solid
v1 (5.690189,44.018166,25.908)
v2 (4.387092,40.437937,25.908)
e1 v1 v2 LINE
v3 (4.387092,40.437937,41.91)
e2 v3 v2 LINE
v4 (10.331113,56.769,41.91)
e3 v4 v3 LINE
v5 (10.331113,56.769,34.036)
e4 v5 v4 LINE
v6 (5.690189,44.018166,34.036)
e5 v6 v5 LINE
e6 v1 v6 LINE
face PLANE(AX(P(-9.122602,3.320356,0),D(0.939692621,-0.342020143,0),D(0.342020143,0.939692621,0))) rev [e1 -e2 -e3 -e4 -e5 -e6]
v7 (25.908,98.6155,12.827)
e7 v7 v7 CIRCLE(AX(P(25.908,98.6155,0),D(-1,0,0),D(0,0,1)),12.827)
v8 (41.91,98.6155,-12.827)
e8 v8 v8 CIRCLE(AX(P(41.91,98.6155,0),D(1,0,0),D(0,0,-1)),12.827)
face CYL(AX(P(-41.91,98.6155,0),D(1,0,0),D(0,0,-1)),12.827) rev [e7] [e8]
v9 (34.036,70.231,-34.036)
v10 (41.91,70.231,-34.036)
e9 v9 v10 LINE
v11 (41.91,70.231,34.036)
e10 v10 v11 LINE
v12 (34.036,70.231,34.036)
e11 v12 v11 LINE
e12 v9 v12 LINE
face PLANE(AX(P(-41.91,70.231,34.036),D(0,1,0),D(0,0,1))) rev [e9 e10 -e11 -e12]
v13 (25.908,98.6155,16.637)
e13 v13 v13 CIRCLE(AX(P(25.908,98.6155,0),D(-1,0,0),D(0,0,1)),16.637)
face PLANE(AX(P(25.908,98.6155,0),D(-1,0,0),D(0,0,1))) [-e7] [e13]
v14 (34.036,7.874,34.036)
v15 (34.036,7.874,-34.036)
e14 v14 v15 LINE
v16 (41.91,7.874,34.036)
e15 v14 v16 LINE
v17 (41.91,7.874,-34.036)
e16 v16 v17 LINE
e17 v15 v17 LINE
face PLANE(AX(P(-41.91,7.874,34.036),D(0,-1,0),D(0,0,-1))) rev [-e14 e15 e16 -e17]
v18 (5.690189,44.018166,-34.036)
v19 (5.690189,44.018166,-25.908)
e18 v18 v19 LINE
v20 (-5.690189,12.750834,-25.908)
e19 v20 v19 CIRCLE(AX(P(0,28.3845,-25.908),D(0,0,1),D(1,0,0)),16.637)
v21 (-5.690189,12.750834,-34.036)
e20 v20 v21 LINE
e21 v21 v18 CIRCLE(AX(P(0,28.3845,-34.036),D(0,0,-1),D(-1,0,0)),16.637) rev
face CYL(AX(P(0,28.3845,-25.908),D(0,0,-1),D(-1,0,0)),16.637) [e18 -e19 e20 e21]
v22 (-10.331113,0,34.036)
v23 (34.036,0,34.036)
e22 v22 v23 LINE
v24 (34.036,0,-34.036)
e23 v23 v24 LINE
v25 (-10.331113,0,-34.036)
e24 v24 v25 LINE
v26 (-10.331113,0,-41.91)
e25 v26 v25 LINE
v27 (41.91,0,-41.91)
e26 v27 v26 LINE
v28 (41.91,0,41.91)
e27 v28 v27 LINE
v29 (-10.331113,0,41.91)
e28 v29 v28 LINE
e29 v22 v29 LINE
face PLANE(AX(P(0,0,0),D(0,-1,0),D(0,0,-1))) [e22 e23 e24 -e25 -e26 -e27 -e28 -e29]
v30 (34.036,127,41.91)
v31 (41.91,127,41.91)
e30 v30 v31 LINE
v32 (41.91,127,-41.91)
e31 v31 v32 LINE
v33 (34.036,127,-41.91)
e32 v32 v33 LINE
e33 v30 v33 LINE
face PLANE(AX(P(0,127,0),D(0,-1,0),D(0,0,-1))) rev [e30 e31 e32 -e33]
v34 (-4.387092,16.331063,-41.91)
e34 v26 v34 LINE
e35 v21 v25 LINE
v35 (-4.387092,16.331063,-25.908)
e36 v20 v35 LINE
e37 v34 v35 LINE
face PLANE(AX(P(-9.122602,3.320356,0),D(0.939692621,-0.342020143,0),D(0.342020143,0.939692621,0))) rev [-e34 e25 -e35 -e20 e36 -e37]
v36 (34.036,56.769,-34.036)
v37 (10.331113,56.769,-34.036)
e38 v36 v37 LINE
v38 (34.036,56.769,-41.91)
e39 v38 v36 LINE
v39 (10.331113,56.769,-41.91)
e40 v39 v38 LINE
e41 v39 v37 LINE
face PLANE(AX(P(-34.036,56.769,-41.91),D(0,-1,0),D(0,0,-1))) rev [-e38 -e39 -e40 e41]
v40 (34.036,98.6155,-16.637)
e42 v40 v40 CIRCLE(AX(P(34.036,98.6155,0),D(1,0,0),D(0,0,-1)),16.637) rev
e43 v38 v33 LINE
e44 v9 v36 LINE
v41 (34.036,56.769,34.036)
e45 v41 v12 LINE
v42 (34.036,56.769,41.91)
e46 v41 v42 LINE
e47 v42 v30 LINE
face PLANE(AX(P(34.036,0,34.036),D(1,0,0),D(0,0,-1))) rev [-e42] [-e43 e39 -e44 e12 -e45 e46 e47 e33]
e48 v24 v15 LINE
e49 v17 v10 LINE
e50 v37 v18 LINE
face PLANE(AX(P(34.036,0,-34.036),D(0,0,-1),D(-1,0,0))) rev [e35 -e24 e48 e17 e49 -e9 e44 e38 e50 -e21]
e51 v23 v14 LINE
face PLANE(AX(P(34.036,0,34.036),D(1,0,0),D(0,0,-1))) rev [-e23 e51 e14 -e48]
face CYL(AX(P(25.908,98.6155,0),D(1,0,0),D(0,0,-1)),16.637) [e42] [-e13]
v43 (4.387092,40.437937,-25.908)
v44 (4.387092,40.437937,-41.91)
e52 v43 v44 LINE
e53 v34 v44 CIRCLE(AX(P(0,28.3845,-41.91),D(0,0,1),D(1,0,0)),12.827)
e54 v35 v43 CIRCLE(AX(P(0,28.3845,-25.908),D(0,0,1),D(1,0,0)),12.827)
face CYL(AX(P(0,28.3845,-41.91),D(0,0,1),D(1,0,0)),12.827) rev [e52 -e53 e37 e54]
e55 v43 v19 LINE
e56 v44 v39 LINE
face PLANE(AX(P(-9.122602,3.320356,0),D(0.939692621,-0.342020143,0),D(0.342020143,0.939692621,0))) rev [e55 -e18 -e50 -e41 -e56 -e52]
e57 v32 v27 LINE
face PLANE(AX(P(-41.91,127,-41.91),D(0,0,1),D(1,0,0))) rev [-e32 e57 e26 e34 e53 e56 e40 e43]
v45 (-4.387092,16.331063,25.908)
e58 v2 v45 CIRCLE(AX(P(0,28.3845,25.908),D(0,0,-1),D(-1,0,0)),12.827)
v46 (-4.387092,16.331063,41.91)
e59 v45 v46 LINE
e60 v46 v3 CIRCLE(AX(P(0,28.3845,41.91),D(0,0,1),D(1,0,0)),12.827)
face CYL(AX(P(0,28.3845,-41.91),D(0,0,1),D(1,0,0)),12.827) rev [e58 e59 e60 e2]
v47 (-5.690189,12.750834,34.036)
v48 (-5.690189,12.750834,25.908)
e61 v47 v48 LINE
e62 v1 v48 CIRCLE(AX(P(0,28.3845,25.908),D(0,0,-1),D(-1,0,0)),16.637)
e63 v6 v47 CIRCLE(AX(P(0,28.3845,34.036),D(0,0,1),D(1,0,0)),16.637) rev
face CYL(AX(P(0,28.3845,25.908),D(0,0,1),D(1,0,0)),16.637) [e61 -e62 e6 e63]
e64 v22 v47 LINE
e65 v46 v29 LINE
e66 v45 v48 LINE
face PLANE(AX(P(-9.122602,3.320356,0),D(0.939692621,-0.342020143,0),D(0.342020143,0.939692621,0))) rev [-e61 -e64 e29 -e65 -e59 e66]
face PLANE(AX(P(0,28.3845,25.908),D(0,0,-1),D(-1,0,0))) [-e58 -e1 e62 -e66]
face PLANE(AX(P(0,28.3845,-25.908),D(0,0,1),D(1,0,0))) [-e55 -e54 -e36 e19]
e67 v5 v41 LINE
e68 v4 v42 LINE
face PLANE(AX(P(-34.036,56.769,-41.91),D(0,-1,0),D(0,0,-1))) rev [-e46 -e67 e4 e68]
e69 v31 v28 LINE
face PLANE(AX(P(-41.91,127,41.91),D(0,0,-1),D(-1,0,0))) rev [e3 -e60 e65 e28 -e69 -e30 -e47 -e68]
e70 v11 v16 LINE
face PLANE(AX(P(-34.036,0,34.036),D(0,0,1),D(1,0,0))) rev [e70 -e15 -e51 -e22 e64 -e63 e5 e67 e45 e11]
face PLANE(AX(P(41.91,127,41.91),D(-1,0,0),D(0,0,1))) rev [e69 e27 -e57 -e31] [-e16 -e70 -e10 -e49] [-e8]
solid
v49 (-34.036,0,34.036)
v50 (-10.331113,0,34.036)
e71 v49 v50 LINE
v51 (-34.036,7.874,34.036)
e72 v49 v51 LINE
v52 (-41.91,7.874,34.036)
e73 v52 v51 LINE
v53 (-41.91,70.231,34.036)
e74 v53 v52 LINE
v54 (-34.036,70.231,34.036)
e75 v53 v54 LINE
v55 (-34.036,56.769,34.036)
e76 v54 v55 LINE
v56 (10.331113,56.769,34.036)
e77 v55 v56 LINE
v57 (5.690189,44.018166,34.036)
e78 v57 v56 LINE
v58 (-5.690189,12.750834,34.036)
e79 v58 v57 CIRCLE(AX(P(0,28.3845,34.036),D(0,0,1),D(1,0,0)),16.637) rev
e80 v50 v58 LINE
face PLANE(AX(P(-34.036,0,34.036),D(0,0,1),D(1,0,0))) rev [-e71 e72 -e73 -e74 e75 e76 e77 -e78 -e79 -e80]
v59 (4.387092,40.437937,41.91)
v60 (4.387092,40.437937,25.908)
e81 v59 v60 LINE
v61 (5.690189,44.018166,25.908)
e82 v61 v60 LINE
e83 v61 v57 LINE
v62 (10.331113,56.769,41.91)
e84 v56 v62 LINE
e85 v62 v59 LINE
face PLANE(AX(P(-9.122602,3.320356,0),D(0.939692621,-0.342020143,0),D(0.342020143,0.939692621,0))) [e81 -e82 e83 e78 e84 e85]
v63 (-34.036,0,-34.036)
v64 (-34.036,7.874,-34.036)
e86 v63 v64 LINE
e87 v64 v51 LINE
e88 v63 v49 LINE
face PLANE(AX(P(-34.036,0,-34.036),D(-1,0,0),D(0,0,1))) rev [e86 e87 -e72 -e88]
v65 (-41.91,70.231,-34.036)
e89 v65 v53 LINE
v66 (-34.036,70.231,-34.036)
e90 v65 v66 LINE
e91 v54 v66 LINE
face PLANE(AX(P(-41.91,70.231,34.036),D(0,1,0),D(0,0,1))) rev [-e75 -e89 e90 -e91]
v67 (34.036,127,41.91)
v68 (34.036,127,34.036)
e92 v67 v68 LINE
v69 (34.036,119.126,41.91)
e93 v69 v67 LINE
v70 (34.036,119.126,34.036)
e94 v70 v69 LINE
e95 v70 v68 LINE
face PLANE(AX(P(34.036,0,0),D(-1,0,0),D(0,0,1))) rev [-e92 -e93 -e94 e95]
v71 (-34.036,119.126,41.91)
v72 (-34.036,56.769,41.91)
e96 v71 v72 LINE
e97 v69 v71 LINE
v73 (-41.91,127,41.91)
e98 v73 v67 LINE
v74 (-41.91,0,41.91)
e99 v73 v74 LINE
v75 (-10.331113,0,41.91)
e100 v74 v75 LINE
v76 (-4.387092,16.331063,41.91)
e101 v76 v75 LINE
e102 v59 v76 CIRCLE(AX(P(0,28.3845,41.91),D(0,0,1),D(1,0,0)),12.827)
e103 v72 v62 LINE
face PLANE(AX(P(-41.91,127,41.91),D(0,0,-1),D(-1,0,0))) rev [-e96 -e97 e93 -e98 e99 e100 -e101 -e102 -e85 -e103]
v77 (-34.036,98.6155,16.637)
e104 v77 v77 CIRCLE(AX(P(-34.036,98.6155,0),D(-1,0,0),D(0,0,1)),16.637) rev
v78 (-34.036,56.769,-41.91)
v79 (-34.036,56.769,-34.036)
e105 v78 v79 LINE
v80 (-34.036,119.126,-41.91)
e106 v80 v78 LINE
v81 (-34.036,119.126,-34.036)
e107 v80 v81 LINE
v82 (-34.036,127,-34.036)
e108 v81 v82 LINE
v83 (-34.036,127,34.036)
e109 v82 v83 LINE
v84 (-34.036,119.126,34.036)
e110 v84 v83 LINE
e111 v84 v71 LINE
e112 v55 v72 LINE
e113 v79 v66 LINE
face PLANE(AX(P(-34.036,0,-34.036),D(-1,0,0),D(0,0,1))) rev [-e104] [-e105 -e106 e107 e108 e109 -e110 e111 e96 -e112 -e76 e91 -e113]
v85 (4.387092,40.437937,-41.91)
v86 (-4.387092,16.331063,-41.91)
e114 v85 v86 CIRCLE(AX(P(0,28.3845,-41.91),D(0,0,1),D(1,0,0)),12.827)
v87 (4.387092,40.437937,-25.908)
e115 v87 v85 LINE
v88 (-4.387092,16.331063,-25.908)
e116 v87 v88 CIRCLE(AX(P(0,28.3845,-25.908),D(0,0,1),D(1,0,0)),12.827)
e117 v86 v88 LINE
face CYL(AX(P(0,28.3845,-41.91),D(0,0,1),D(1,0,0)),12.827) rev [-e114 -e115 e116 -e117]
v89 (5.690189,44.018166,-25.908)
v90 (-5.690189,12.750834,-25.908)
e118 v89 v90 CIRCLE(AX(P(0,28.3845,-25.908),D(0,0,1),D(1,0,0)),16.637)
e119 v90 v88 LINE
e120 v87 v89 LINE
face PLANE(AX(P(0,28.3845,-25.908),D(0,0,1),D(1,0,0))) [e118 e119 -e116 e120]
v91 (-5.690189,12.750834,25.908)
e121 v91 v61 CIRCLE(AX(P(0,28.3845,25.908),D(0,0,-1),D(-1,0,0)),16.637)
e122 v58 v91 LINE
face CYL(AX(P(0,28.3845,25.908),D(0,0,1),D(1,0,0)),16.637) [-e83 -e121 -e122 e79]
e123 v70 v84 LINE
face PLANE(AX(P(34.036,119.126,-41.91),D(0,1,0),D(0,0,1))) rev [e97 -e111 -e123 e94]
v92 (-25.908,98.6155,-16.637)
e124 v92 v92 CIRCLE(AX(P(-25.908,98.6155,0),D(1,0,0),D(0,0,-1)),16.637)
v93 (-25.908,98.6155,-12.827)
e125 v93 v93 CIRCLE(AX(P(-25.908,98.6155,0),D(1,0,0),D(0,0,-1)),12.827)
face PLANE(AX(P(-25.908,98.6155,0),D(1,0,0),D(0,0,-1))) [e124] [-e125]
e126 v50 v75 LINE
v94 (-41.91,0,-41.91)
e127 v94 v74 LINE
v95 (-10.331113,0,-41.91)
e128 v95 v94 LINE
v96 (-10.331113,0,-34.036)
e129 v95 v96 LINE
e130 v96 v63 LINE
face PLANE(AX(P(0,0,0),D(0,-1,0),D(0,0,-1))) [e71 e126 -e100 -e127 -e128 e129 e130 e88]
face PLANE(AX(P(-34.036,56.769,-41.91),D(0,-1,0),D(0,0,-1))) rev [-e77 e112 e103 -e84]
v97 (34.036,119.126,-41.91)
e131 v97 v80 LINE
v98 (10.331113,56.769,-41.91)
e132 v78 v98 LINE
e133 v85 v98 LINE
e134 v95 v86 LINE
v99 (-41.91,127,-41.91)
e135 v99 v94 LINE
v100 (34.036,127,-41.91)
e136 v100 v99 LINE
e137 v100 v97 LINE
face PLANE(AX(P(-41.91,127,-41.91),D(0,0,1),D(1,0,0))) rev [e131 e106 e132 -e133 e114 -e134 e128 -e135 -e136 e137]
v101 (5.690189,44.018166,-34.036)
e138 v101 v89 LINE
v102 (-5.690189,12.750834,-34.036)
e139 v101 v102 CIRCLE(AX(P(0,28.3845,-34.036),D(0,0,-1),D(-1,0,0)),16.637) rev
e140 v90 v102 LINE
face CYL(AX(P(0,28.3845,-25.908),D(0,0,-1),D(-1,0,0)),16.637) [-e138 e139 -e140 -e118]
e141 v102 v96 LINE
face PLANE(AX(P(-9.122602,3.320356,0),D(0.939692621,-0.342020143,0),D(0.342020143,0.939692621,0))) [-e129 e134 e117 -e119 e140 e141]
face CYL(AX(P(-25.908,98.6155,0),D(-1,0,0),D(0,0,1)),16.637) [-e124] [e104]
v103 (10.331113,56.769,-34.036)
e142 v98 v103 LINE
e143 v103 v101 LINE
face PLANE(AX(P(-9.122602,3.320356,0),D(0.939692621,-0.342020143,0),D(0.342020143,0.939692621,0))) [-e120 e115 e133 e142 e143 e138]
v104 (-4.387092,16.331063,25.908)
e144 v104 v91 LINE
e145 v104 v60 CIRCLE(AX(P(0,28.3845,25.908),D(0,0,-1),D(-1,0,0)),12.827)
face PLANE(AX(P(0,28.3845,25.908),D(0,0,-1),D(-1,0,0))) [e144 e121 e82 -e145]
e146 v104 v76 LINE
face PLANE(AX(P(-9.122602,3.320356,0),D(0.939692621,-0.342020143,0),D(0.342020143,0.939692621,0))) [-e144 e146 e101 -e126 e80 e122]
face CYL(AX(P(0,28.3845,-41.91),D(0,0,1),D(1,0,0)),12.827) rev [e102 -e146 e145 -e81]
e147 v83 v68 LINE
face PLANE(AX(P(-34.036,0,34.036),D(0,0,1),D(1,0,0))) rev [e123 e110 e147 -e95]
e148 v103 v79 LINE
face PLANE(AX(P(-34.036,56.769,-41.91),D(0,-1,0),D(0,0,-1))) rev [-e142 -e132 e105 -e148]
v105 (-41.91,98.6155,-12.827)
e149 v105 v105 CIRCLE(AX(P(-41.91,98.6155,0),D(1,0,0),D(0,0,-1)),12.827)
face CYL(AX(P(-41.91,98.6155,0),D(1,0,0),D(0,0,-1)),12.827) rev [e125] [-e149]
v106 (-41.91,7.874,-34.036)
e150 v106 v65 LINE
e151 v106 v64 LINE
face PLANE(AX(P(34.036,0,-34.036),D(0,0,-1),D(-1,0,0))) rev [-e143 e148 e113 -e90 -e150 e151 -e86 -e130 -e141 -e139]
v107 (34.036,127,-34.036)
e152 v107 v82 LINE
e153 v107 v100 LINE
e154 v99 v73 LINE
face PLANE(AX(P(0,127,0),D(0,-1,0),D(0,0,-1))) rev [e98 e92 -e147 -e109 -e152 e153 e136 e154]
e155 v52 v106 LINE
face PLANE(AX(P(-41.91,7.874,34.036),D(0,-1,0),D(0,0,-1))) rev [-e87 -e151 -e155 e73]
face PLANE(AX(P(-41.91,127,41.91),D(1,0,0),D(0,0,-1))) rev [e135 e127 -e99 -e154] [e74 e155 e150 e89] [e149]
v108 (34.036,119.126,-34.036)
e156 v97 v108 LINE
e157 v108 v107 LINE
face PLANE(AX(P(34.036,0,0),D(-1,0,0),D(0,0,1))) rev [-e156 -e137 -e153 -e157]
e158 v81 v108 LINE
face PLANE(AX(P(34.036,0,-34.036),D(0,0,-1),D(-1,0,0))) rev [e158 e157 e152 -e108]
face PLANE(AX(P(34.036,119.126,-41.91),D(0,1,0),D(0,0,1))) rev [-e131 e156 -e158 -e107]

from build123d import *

# Parameters (mm, degrees)
SKETCH2_W                = 83.82
SKETCH2_H                = 83.82
BOSS_EXTRUDE1_DEPTH      = 127
SKETCH3_R                = 12.827
CUT_EXTRUDE1_DEPTH       = 158.832951249
SKETCH4_R                = 12.827
CUT_EXTRUDE2_DEPTH       = 158.832951249
SKETCH5_W                = 68.072
SKETCH5_H                = 68.072
CUT_EXTRUDE3_DEPTH       = 141.149549411
SKETCH6_W                = 68.072
SKETCH6_H                = 62.357
CUT_EXTRUDE4_DEPTH       = 158.832951249
SKETCH7_W                = 68.072
SKETCH7_H                = 62.357
CUT_EXTRUDE5_DEPTH       = 158.832951249
BOSS_EXTRUDE6_START      = 8.128
SKETCH18_R               = 16.637
SKETCH18_R_2             = 12.827
BOSS_EXTRUDE6_DEPTH      = 8.128
SKETCH19_R               = 16.637
SKETCH19_R_2             = 12.827
BOSS_EXTRUDE7_DEPTH      = 8.128
SKETCH20_R               = 16.637
SKETCH20_R_2             = 12.827
BOSS_EXTRUDE8_DEPTH      = 8.128
BOSS_EXTRUDE9_START      = 8.128
SKETCH21_R               = 16.637
SKETCH21_R_2             = 12.827
BOSS_EXTRUDE9_DEPTH      = 8.128
INTERSECT1_START         = -41.91
INTERSECT1_DEPTH         = 83.82
INTERSECT1_START_2       = -25.908
INTERSECT1_2_OUTLINE_W   = 8.128
INTERSECT1_2_OUTLINE_H   = 56.769
INTERSECT1_2_DEPTH       = 51.816
INTERSECT1_3_OUTLINE_W   = 7.874
INTERSECT1_3_OUTLINE_H   = 56.769
INTERSECT1_3_OUTLINE_H_2 = 7.874
INTERSECT1_3_DEPTH       = 83.82
INTERSECT1_4_DEPTH       = 7.874
INTERSECT1_START_3       = 34.036
INTERSECT1_5_DEPTH       = 7.874
INTERSECT1_START_4       = -34.036
INTERSECT1_6_DEPTH       = 8.128
INTERSECT1_START_5       = 25.908
INTERSECT1_7_DEPTH       = 8.128
INTERSECT1_8_OUTLINE_R   = 12.827
INTERSECT1_8_DEPTH       = 7.874
INTERSECT1_9_OUTLINE_R   = 16.637
INTERSECT1_9_OUTLINE_R_2 = 12.827
INTERSECT1_9_DEPTH       = 8.128


with BuildPart() as part:
    # Sketch2 → Boss-Extrude1 (new body)
    with BuildSketch(Plane(origin=(0, 0, 0), x_dir=(1, 0, 0), z_dir=(0, 1, 0))):
        Rectangle(SKETCH2_W, SKETCH2_H)
    extrude(amount=BOSS_EXTRUDE1_DEPTH)

    # Sketch3 → Cut-Extrude1 (cut, through all)
    with BuildSketch(Plane.XY.offset(41.91)):
        with Locations((0, 28.3845)):
            Circle(SKETCH3_R)
    extrude(amount=-CUT_EXTRUDE1_DEPTH, mode=Mode.SUBTRACT)

    # Sketch4 → Cut-Extrude2 (cut, through all)
    with BuildSketch(Plane(origin=(41.91, 0, 0), x_dir=(0, 0, -1), z_dir=(1, 0, 0))):
        with Locations((0, 98.6155)):
            Circle(SKETCH4_R)
    extrude(amount=-CUT_EXTRUDE2_DEPTH, mode=Mode.SUBTRACT)

    # Sketch5 → Cut-Extrude3 (cut, through all)
    with BuildSketch(Plane(origin=(0, 127, 0), x_dir=(1, 0, 0), z_dir=(0, 1, 0))):
        Rectangle(SKETCH5_W, SKETCH5_H)
    extrude(amount=-CUT_EXTRUDE3_DEPTH, mode=Mode.SUBTRACT)

    # Sketch6 → Cut-Extrude4 (cut, through all)
    with BuildSketch(Plane(origin=(41.91, 0, 0), x_dir=(0, 0, -1), z_dir=(1, 0, 0))):
        with Locations((0, 39.0525)):
            Rectangle(SKETCH6_W, SKETCH6_H)
    extrude(amount=-CUT_EXTRUDE4_DEPTH, mode=Mode.SUBTRACT)

    # Sketch7 → Cut-Extrude5 (cut, through all)
    with BuildSketch(Plane.XY.offset(41.91)):
        with Locations((0, 87.9475)):
            Rectangle(SKETCH7_W, SKETCH7_H)
    extrude(amount=-CUT_EXTRUDE5_DEPTH, mode=Mode.SUBTRACT)

    # Sketch18 → Boss-Extrude6 (add)
    with BuildSketch(Plane(origin=(-34.036, 0, 0), x_dir=(0, 0, -1), z_dir=(1, 0, 0)).offset(BOSS_EXTRUDE6_START)):
        with Locations(Location((0, 98.6155, 0), (0, 0, 180))):
            Circle(SKETCH18_R)
        with Locations((0, 98.6155)):
            Circle(SKETCH18_R_2, mode=Mode.SUBTRACT)
    extrude(amount=-BOSS_EXTRUDE6_DEPTH)

    # Sketch19 → Boss-Extrude7 (add)
    with BuildSketch(Plane.ZY.offset(-34.036)):
        with Locations((0, 98.6155)):
            Circle(SKETCH19_R)
        with Locations(Location((0, 98.6155, 0), (0, 0, 180))):
            Circle(SKETCH19_R_2, mode=Mode.SUBTRACT)
    extrude(amount=BOSS_EXTRUDE7_DEPTH)

    # Sketch20 → Boss-Extrude8 (add)
    with BuildSketch(Plane(origin=(0, 0, 34.036), x_dir=(-1, 0, 0), z_dir=(0, 0, -1))):
        with Locations(Location((0, 28.3845, 0), (0, 0, 180))):
            Circle(SKETCH20_R)
        with Locations(Location((0, 28.3845, 0), (0, 0, 180))):
            Circle(SKETCH20_R_2, mode=Mode.SUBTRACT)
    extrude(amount=BOSS_EXTRUDE8_DEPTH)

    # Sketch21 → Boss-Extrude9 (add)
    with BuildSketch(Plane.XY.offset(-34.036).offset(BOSS_EXTRUDE9_START)):
        with Locations((0, 28.3845)):
            Circle(SKETCH21_R)
        with Locations((0, 28.3845)):
            Circle(SKETCH21_R_2, mode=Mode.SUBTRACT)
    extrude(amount=-BOSS_EXTRUDE9_DEPTH)

    # Intersect1: read off the stored shape, not the designer's step
    # Intersect1 outline → Intersect1 (cut)
    with BuildSketch(Plane.XY.offset(INTERSECT1_START)):
        with BuildLine():
            Line((41.91, 127), (34.036, 127))
            Line((34.036, 127), (34.036, 56.769))
            Line((34.036, 56.769), (10.331113115, 56.769))
            Line((10.331113115, 56.769), (4.387092378, 40.437937247))
            ThreePointArc((4.387092378, 40.437937247), (12.053437247, 23.997407622), (-4.387092378, 16.331062753))
            Line((-4.387092378, 16.331062753), (-10.331113115, 0))
            Line((-10.331113115, 0), (41.91, 0))
            Line((41.91, 0), (41.91, 127))
        make_face()
    extrude(amount=INTERSECT1_DEPTH, mode=Mode.SUBTRACT)

    # Intersect1 2 outline → Intersect1 2 (cut)
    with BuildSketch(Plane.XY.offset(INTERSECT1_START_2)):
        with Locations((29.972, 98.6155)):
            Rectangle(INTERSECT1_2_OUTLINE_W, INTERSECT1_2_OUTLINE_H)
    extrude(amount=INTERSECT1_2_DEPTH, mode=Mode.SUBTRACT)


with BuildPart() as body_2:
    # Intersect1 3 outline → Intersect1 3 (new body)
    with BuildSketch(Plane.XY.offset(INTERSECT1_START)):
        with Locations((37.973, 98.6155)):
            Rectangle(INTERSECT1_3_OUTLINE_W, INTERSECT1_3_OUTLINE_H)
        with Locations((37.973, 3.937)):
            Rectangle(INTERSECT1_3_OUTLINE_W, INTERSECT1_3_OUTLINE_H_2)
    extrude(amount=INTERSECT1_3_DEPTH)

    # Intersect1 4 outline → Intersect1 4 (add)
    with BuildSketch(Plane.XY.offset(INTERSECT1_START)):
        with BuildLine():
            ThreePointArc((4.387092378, 40.437937247), (12.053437247, 23.997407622), (-4.387092378, 16.331062753))
            Line((-4.387092378, 16.331062753), (-10.331113115, 0))
            Line((-10.331113115, 0), (34.036, 0))
            Line((34.036, 0), (34.036, 7.874))
            Line((34.036, 7.874), (41.91, 7.874))
            Line((41.91, 7.874), (41.91, 70.231))
            Line((41.91, 70.231), (34.036, 70.231))
            Line((34.036, 70.231), (34.036, 56.769))
            Line((34.036, 56.769), (10.331113115, 56.769))
            Line((10.331113115, 56.769), (4.387092378, 40.437937247))
        make_face()
    extrude(amount=INTERSECT1_4_DEPTH)

    # Intersect1 5 outline → Intersect1 5 (add)
    with BuildSketch(Plane.XY.offset(INTERSECT1_START_3)):
        with BuildLine():
            ThreePointArc((4.387092378, 40.437937247), (12.053437247, 23.997407622), (-4.387092378, 16.331062753))
            Line((-4.387092378, 16.331062753), (-10.331113115, 0))
            Line((-10.331113115, 0), (34.036, 0))
            Line((34.036, 0), (34.036, 7.874))
            Line((34.036, 7.874), (41.91, 7.874))
            Line((41.91, 7.874), (41.91, 70.231))
            Line((41.91, 70.231), (34.036, 70.231))
            Line((34.036, 70.231), (34.036, 56.769))
            Line((34.036, 56.769), (10.331113115, 56.769))
            Line((10.331113115, 56.769), (4.387092378, 40.437937247))
        make_face()
    extrude(amount=INTERSECT1_5_DEPTH)

    # Intersect1 6 outline → Intersect1 6 (add)
    with BuildSketch(Plane.XY.offset(INTERSECT1_START_4)):
        with BuildLine():
            Line((5.690189125, 44.018166132), (4.387092378, 40.437937247))
            ThreePointArc((4.387092378, 40.437937247), (12.053437247, 23.997407622), (-4.387092378, 16.331062753))
            Line((-4.387092378, 16.331062753), (-5.690189125, 12.750833868))
            ThreePointArc((-5.690189125, 12.750833868), (15.633666132, 22.694310875), (5.690189125, 44.018166132))
        make_face()
    extrude(amount=INTERSECT1_6_DEPTH)

    # Intersect1 7 outline → Intersect1 7 (add)
    with BuildSketch(Plane.XY.offset(INTERSECT1_START_5)):
        with BuildLine():
            Line((5.690189125, 44.018166132), (4.387092378, 40.437937247))
            ThreePointArc((4.387092378, 40.437937247), (12.053437247, 23.997407622), (-4.387092378, 16.331062753))
            Line((-4.387092378, 16.331062753), (-5.690189125, 12.750833868))
            ThreePointArc((-5.690189125, 12.750833868), (15.633666132, 22.694310875), (5.690189125, 44.018166132))
        make_face()
    extrude(amount=INTERSECT1_7_DEPTH)

    # Intersect1 8 outline → Intersect1 8 (cut)
    with BuildSketch(Plane.YZ.offset(INTERSECT1_START_3)):
        with Locations((98.6155, 0)):
            Circle(INTERSECT1_8_OUTLINE_R)
    extrude(amount=INTERSECT1_8_DEPTH, mode=Mode.SUBTRACT)

    # Intersect1 9 outline → Intersect1 9 (add)
    with BuildSketch(Plane.YZ.offset(INTERSECT1_START_5)):
        with Locations((98.6155, 0)):
            Circle(INTERSECT1_9_OUTLINE_R)
        with Locations((98.6155, 0)):
            Circle(INTERSECT1_9_OUTLINE_R_2, mode=Mode.SUBTRACT)
    extrude(amount=INTERSECT1_9_DEPTH)


solid = Compound([part.part, body_2.part])
